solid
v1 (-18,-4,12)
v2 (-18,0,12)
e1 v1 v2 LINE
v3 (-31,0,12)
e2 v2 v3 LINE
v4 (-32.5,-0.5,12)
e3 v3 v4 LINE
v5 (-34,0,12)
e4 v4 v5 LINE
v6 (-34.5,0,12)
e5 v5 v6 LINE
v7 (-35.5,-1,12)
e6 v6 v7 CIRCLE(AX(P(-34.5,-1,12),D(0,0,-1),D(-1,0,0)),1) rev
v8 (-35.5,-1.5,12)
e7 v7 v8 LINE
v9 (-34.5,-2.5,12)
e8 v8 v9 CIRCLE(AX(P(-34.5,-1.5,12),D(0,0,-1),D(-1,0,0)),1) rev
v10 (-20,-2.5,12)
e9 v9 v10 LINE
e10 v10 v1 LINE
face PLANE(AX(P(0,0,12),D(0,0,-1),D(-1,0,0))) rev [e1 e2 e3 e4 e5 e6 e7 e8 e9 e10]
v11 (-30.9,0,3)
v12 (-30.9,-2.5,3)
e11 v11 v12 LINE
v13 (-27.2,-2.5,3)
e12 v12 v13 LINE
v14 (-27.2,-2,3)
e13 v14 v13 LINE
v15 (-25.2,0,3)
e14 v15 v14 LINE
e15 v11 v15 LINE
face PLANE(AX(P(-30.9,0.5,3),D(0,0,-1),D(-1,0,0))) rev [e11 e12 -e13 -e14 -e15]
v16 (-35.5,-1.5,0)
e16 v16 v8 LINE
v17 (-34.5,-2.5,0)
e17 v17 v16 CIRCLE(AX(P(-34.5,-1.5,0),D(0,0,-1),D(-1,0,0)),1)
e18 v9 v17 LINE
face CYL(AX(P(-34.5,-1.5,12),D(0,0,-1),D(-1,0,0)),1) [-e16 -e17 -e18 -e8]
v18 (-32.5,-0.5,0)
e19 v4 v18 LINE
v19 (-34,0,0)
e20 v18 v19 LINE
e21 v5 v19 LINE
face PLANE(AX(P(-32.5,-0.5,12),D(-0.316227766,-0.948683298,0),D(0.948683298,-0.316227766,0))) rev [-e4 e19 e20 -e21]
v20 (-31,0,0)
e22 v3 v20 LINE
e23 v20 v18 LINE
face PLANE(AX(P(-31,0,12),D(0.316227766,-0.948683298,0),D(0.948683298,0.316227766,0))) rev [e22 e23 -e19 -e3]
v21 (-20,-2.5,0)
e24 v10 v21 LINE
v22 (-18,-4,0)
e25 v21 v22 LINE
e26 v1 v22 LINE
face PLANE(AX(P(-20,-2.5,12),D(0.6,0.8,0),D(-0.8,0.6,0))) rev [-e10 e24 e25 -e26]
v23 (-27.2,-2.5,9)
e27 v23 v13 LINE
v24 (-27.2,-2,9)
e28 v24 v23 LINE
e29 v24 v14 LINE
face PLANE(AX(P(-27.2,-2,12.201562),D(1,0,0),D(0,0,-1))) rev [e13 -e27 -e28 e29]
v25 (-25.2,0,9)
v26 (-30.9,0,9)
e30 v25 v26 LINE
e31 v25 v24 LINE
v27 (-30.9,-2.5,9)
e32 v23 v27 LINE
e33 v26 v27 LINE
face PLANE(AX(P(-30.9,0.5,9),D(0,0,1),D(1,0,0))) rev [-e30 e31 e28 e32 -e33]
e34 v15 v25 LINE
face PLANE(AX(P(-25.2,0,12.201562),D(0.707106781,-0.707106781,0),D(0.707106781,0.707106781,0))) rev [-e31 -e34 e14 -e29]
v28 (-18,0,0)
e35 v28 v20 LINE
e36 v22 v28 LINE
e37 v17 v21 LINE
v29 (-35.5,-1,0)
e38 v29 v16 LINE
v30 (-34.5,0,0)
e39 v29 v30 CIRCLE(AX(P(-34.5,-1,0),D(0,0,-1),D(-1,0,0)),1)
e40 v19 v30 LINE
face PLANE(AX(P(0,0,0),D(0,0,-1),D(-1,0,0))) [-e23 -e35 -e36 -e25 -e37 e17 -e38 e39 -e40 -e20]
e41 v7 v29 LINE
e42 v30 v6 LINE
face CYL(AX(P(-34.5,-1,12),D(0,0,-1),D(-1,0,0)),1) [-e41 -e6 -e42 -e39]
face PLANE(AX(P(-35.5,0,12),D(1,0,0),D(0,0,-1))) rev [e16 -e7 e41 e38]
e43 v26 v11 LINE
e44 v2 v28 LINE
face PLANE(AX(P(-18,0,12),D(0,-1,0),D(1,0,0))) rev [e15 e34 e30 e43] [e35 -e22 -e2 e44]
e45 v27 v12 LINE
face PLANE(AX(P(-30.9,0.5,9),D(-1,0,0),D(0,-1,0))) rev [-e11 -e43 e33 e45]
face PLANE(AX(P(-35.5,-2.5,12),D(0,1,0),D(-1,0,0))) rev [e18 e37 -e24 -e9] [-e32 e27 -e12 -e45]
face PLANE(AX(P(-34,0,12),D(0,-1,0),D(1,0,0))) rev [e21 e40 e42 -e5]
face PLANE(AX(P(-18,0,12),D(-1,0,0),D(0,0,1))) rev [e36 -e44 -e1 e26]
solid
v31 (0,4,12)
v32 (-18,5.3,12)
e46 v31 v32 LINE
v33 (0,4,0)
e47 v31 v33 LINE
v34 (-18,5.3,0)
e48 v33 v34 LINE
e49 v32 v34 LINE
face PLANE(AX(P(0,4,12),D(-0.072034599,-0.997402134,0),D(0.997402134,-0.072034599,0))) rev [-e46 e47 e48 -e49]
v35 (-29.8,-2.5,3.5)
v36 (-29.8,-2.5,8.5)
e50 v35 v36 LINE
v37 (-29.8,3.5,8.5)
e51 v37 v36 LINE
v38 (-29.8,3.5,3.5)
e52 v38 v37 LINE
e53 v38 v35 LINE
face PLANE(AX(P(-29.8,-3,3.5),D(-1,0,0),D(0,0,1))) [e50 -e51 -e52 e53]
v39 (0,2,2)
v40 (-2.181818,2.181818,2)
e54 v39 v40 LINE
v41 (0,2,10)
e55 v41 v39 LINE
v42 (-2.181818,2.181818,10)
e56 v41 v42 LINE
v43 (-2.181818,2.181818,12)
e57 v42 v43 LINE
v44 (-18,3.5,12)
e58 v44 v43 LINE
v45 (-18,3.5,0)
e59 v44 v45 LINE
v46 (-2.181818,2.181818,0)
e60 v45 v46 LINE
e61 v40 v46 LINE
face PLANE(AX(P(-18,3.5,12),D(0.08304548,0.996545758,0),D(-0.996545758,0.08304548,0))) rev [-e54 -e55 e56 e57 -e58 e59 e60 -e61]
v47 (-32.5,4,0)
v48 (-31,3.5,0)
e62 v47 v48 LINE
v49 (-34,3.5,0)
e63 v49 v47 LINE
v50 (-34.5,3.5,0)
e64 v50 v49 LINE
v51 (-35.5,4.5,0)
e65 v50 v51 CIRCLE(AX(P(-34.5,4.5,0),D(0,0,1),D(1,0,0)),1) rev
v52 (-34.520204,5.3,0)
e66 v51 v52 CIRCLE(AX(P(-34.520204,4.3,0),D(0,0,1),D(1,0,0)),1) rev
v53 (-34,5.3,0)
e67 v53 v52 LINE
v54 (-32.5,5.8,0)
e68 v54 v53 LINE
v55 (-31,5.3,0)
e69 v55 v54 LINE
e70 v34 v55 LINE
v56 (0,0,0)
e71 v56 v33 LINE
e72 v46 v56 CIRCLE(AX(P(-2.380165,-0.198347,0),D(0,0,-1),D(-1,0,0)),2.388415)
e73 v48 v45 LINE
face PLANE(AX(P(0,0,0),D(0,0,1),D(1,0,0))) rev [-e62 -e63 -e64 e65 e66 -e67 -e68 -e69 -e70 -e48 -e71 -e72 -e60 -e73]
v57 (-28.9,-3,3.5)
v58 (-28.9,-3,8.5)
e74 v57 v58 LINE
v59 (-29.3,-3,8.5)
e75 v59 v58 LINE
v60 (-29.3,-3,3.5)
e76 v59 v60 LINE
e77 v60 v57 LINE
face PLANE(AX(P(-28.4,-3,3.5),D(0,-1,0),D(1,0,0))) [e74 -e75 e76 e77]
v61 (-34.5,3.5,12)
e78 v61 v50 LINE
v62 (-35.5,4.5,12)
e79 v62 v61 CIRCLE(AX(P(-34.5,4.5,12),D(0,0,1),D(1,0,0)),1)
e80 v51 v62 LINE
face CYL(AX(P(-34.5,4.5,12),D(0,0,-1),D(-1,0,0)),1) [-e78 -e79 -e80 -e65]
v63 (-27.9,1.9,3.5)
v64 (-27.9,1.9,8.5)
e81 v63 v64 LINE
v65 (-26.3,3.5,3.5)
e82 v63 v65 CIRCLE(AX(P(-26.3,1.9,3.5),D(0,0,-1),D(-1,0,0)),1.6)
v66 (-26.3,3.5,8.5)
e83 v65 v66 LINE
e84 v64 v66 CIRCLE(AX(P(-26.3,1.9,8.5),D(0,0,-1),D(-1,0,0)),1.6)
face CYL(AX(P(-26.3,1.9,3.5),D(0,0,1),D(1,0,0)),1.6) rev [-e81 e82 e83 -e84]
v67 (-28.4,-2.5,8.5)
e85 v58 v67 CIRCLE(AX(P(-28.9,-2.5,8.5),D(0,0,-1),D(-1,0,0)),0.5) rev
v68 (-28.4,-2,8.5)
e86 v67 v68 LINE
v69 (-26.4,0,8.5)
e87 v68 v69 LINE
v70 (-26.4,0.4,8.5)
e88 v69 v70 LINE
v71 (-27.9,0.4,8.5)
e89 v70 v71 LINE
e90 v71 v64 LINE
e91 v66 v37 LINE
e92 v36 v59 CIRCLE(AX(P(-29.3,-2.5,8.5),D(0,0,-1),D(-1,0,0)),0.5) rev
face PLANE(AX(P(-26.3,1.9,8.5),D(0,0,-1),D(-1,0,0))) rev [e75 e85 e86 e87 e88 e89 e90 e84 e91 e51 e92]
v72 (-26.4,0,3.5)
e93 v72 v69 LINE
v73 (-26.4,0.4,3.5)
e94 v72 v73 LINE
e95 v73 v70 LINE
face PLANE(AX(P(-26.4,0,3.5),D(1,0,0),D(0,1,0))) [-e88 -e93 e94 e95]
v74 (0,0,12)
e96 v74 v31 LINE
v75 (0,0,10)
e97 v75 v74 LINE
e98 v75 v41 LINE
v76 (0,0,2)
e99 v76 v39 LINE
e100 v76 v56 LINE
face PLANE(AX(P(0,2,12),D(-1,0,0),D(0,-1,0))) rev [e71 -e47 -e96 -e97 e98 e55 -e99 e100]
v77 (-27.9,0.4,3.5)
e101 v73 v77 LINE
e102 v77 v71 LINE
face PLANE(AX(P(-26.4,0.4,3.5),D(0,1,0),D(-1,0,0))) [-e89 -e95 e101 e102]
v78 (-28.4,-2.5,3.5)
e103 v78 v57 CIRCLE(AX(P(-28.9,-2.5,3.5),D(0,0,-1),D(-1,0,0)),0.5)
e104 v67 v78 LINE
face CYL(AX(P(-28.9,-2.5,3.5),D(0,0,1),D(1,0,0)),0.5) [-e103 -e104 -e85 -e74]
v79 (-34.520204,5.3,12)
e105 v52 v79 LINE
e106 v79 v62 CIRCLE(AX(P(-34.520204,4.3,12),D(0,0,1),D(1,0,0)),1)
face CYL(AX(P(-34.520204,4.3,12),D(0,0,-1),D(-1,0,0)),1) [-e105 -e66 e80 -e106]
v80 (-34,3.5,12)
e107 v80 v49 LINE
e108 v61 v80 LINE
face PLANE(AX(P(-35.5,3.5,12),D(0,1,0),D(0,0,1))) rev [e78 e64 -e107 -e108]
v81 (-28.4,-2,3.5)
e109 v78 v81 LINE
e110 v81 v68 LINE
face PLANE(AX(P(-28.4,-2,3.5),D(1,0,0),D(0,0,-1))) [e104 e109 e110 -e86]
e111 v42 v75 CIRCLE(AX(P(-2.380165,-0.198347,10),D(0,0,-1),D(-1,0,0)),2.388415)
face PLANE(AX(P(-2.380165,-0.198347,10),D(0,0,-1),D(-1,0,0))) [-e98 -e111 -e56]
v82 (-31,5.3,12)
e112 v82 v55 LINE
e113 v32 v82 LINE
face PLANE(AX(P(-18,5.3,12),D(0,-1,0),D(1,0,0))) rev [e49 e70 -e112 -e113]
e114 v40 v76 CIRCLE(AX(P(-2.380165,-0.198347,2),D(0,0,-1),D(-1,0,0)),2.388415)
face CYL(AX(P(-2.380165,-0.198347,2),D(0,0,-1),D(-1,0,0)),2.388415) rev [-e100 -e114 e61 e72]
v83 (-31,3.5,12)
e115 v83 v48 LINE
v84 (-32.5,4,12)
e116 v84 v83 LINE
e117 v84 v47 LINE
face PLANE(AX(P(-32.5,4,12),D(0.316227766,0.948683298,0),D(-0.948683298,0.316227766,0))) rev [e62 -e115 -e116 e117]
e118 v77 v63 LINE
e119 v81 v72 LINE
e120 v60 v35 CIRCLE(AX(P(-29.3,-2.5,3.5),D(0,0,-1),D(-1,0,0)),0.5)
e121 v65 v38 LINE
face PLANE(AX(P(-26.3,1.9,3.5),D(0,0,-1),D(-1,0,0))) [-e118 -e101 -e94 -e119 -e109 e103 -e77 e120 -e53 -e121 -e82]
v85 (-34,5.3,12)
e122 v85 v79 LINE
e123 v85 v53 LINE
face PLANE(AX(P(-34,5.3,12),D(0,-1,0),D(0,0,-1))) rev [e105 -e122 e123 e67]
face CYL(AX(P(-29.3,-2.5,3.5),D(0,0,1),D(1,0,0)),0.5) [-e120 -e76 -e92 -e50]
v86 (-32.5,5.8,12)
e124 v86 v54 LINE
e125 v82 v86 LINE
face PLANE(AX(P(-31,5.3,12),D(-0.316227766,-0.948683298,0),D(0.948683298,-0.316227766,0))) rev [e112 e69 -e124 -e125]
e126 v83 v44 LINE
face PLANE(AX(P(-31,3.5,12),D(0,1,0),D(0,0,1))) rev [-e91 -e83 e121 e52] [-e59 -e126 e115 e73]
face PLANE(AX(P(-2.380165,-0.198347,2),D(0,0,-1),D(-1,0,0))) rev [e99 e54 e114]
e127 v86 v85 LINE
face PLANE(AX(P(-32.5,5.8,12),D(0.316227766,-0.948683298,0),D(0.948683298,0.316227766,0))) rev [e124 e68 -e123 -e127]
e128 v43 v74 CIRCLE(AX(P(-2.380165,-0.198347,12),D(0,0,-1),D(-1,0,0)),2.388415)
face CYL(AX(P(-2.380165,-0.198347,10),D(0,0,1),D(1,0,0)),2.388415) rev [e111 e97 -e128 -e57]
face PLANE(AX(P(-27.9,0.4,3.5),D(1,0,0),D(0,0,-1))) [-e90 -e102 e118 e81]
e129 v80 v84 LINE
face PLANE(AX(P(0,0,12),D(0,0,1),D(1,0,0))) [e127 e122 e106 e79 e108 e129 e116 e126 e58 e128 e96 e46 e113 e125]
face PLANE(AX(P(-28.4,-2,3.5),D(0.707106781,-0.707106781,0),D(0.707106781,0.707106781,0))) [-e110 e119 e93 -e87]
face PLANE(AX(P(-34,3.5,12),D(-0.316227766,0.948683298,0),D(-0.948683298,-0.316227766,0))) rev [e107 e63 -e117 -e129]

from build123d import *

# Parameters (mm, degrees)
BOSS_EXTRUDE1_DEPTH   = 12
BOSS_EXTRUDE1_2_DEPTH = 12
SKETCH2_W             = 5.7
SKETCH2_H             = 6
CUT_EXTRUDE1_DEPTH    = 3
BOSS_EXTRUDE2_DEPTH   = 6
BOSS_EXTRUDE3_START   = -6
BOSS_EXTRUDE3_DEPTH   = 2.5
FILLET7_R             = 1
FILLET8_R             = 1
FILLET10_R            = 1
FILLET11_R            = 1
BOSS_EXTRUDE4_DEPTH   = 2
BOSS_EXTRUDE5_START   = -10
BOSS_EXTRUDE5_DEPTH   = 2
FILLET12_R            = 0.5


with BuildPart() as part:
    # Sketch1 → Boss-Extrude1 (new body)
    with BuildSketch(Plane.XY):
        Polygon((0, 4), (-18, 5.3), (-31, 5.3), (-32.5, 5.8), (-34, 5.3), (-35.5, 5.3), (-35.5, 3.5), (-34, 3.5), (-32.5, 4), (-31, 3.5), (-18, 3.5), (0, 2), align=None)
    extrude(amount=BOSS_EXTRUDE1_DEPTH)

    # Sketch4 → Boss-Extrude3 (add, symmetric)
    with BuildSketch(Plane.XY.offset(12).offset(BOSS_EXTRUDE3_START)):
        with BuildLine():
            Line((-28.4, -2), (-26.4, 0))
            Line((-26.4, 0), (-26.4, 0.4))
            Line((-26.4, 0.4), (-27.9, 0.4))
            Line((-27.9, 0.4), (-27.9, 1.9))
            ThreePointArc((-27.9, 1.9), (-27.43137085, 3.03137085), (-26.3, 3.5))
            Line((-26.3, 3.5), (-29.8, 3.5))
            Line((-29.8, 3.5), (-29.8, -3))
            Line((-29.8, -3), (-28.4, -3))
            Line((-28.4, -3), (-28.4, -2))
        make_face()
    extrude(amount=BOSS_EXTRUDE3_DEPTH, both=True)

    # Fillet8
    fillet8_edges = [part.edges().sort_by_distance(p)[0] for p in [
        (-35.5, 3.5, 6),
    ]]
    fillet(fillet8_edges, radius=FILLET8_R)

    # Fillet10
    # the kernel refuses this fillet: 1 mm, written as the material it takes off along each edge
    with BuildSketch(Plane(origin=(-35.5, 5.3, -2.449489743), x_dir=(1.545430450277731e-12, -1.0, 0), z_dir=(0, 0, 1))) as fillet10_piece_1:
        with BuildLine():
            CenterArc((1, 0.979795897), FILLET10_R, 180, 78.463040967)
            Line((0, 0.979795897), (-0.02, 0.979795897))
            Line((-0.02, 0.979795897), (-0.02, 0))
            Line((-0.02, 0), (0, -0.02))
            ThreePointArc((0, -0.02), (0.4, -0.02), (0.796, -0.019595918))
            Line((0.796, -0.019595918), (0.8, 0))
        make_face()
    extrude(amount=16.898979486, mode=Mode.SUBTRACT)

    # Sketch5 → Boss-Extrude4 (add)
    with BuildSketch(Plane.XY.offset(12)):
        with BuildLine():
            Line((0, 2), (0, 0))
            ThreePointArc((0, 0), (-0.691300526, 1.490517656), (-2.181818182, 2.181818182))
            Line((-2.181818182, 2.181818182), (0, 2))
        make_face()
    extrude(amount=-BOSS_EXTRUDE4_DEPTH)

    # Sketch5<2> → Boss-Extrude5 (add)
    with BuildSketch(Plane.XY.offset(12).offset(BOSS_EXTRUDE5_START)):
        with BuildLine():
            Line((0, 2), (0, 0))
            ThreePointArc((0, 0), (-0.691300526, 1.490517656), (-2.181818182, 2.181818182))
            Line((-2.181818182, 2.181818182), (0, 2))
        make_face()
    extrude(amount=-BOSS_EXTRUDE5_DEPTH)

    # Fillet12
    fillet12_edges = [part.edges().sort_by_distance(p)[0] for p in [
        (-28.4, -3, 6),
        (-29.8, -3, 6),
    ]]
    fillet(fillet12_edges, radius=FILLET12_R)


with BuildPart() as body_2:
    # Sketch1 → Boss-Extrude1 2 (new body)
    with BuildSketch(Plane.XY):
        Polygon((-35.5, -2.5), (-20, -2.5), (-18, -4), (-18, 0), (-31, 0), (-32.5, -0.5), (-34, 0), (-35.5, 0), align=None)
    extrude(amount=BOSS_EXTRUDE1_2_DEPTH)

    # Sketch2 → Cut-Extrude1 (cut)
    with BuildSketch(Plane.XZ.offset(2.5)):
        with Locations((-28.05, 6)):
            Rectangle(SKETCH2_W, SKETCH2_H)
    extrude(amount=-CUT_EXTRUDE1_DEPTH, mode=Mode.SUBTRACT)

    # Sketch3 → Boss-Extrude2 (add)
    with BuildSketch(Plane.XY.offset(3)):
        Polygon((-25.2, 0), (-27.2, -2), (-27.2, -2.5), (-25.2, -2.5), align=None)
    extrude(amount=BOSS_EXTRUDE2_DEPTH)

    # Fillet7
    fillet7_edges = [body_2.edges().sort_by_distance(p)[0] for p in [
        (-35.5, 0, 6),
    ]]
    fillet(fillet7_edges, radius=FILLET7_R)

    # Fillet11
    fillet11_edges = [body_2.edges().sort_by_distance(p)[0] for p in [
        (-35.5, -2.5, 6),
    ]]
    fillet(fillet11_edges, radius=FILLET11_R)


solid = Compound([part.part, body_2.part])
